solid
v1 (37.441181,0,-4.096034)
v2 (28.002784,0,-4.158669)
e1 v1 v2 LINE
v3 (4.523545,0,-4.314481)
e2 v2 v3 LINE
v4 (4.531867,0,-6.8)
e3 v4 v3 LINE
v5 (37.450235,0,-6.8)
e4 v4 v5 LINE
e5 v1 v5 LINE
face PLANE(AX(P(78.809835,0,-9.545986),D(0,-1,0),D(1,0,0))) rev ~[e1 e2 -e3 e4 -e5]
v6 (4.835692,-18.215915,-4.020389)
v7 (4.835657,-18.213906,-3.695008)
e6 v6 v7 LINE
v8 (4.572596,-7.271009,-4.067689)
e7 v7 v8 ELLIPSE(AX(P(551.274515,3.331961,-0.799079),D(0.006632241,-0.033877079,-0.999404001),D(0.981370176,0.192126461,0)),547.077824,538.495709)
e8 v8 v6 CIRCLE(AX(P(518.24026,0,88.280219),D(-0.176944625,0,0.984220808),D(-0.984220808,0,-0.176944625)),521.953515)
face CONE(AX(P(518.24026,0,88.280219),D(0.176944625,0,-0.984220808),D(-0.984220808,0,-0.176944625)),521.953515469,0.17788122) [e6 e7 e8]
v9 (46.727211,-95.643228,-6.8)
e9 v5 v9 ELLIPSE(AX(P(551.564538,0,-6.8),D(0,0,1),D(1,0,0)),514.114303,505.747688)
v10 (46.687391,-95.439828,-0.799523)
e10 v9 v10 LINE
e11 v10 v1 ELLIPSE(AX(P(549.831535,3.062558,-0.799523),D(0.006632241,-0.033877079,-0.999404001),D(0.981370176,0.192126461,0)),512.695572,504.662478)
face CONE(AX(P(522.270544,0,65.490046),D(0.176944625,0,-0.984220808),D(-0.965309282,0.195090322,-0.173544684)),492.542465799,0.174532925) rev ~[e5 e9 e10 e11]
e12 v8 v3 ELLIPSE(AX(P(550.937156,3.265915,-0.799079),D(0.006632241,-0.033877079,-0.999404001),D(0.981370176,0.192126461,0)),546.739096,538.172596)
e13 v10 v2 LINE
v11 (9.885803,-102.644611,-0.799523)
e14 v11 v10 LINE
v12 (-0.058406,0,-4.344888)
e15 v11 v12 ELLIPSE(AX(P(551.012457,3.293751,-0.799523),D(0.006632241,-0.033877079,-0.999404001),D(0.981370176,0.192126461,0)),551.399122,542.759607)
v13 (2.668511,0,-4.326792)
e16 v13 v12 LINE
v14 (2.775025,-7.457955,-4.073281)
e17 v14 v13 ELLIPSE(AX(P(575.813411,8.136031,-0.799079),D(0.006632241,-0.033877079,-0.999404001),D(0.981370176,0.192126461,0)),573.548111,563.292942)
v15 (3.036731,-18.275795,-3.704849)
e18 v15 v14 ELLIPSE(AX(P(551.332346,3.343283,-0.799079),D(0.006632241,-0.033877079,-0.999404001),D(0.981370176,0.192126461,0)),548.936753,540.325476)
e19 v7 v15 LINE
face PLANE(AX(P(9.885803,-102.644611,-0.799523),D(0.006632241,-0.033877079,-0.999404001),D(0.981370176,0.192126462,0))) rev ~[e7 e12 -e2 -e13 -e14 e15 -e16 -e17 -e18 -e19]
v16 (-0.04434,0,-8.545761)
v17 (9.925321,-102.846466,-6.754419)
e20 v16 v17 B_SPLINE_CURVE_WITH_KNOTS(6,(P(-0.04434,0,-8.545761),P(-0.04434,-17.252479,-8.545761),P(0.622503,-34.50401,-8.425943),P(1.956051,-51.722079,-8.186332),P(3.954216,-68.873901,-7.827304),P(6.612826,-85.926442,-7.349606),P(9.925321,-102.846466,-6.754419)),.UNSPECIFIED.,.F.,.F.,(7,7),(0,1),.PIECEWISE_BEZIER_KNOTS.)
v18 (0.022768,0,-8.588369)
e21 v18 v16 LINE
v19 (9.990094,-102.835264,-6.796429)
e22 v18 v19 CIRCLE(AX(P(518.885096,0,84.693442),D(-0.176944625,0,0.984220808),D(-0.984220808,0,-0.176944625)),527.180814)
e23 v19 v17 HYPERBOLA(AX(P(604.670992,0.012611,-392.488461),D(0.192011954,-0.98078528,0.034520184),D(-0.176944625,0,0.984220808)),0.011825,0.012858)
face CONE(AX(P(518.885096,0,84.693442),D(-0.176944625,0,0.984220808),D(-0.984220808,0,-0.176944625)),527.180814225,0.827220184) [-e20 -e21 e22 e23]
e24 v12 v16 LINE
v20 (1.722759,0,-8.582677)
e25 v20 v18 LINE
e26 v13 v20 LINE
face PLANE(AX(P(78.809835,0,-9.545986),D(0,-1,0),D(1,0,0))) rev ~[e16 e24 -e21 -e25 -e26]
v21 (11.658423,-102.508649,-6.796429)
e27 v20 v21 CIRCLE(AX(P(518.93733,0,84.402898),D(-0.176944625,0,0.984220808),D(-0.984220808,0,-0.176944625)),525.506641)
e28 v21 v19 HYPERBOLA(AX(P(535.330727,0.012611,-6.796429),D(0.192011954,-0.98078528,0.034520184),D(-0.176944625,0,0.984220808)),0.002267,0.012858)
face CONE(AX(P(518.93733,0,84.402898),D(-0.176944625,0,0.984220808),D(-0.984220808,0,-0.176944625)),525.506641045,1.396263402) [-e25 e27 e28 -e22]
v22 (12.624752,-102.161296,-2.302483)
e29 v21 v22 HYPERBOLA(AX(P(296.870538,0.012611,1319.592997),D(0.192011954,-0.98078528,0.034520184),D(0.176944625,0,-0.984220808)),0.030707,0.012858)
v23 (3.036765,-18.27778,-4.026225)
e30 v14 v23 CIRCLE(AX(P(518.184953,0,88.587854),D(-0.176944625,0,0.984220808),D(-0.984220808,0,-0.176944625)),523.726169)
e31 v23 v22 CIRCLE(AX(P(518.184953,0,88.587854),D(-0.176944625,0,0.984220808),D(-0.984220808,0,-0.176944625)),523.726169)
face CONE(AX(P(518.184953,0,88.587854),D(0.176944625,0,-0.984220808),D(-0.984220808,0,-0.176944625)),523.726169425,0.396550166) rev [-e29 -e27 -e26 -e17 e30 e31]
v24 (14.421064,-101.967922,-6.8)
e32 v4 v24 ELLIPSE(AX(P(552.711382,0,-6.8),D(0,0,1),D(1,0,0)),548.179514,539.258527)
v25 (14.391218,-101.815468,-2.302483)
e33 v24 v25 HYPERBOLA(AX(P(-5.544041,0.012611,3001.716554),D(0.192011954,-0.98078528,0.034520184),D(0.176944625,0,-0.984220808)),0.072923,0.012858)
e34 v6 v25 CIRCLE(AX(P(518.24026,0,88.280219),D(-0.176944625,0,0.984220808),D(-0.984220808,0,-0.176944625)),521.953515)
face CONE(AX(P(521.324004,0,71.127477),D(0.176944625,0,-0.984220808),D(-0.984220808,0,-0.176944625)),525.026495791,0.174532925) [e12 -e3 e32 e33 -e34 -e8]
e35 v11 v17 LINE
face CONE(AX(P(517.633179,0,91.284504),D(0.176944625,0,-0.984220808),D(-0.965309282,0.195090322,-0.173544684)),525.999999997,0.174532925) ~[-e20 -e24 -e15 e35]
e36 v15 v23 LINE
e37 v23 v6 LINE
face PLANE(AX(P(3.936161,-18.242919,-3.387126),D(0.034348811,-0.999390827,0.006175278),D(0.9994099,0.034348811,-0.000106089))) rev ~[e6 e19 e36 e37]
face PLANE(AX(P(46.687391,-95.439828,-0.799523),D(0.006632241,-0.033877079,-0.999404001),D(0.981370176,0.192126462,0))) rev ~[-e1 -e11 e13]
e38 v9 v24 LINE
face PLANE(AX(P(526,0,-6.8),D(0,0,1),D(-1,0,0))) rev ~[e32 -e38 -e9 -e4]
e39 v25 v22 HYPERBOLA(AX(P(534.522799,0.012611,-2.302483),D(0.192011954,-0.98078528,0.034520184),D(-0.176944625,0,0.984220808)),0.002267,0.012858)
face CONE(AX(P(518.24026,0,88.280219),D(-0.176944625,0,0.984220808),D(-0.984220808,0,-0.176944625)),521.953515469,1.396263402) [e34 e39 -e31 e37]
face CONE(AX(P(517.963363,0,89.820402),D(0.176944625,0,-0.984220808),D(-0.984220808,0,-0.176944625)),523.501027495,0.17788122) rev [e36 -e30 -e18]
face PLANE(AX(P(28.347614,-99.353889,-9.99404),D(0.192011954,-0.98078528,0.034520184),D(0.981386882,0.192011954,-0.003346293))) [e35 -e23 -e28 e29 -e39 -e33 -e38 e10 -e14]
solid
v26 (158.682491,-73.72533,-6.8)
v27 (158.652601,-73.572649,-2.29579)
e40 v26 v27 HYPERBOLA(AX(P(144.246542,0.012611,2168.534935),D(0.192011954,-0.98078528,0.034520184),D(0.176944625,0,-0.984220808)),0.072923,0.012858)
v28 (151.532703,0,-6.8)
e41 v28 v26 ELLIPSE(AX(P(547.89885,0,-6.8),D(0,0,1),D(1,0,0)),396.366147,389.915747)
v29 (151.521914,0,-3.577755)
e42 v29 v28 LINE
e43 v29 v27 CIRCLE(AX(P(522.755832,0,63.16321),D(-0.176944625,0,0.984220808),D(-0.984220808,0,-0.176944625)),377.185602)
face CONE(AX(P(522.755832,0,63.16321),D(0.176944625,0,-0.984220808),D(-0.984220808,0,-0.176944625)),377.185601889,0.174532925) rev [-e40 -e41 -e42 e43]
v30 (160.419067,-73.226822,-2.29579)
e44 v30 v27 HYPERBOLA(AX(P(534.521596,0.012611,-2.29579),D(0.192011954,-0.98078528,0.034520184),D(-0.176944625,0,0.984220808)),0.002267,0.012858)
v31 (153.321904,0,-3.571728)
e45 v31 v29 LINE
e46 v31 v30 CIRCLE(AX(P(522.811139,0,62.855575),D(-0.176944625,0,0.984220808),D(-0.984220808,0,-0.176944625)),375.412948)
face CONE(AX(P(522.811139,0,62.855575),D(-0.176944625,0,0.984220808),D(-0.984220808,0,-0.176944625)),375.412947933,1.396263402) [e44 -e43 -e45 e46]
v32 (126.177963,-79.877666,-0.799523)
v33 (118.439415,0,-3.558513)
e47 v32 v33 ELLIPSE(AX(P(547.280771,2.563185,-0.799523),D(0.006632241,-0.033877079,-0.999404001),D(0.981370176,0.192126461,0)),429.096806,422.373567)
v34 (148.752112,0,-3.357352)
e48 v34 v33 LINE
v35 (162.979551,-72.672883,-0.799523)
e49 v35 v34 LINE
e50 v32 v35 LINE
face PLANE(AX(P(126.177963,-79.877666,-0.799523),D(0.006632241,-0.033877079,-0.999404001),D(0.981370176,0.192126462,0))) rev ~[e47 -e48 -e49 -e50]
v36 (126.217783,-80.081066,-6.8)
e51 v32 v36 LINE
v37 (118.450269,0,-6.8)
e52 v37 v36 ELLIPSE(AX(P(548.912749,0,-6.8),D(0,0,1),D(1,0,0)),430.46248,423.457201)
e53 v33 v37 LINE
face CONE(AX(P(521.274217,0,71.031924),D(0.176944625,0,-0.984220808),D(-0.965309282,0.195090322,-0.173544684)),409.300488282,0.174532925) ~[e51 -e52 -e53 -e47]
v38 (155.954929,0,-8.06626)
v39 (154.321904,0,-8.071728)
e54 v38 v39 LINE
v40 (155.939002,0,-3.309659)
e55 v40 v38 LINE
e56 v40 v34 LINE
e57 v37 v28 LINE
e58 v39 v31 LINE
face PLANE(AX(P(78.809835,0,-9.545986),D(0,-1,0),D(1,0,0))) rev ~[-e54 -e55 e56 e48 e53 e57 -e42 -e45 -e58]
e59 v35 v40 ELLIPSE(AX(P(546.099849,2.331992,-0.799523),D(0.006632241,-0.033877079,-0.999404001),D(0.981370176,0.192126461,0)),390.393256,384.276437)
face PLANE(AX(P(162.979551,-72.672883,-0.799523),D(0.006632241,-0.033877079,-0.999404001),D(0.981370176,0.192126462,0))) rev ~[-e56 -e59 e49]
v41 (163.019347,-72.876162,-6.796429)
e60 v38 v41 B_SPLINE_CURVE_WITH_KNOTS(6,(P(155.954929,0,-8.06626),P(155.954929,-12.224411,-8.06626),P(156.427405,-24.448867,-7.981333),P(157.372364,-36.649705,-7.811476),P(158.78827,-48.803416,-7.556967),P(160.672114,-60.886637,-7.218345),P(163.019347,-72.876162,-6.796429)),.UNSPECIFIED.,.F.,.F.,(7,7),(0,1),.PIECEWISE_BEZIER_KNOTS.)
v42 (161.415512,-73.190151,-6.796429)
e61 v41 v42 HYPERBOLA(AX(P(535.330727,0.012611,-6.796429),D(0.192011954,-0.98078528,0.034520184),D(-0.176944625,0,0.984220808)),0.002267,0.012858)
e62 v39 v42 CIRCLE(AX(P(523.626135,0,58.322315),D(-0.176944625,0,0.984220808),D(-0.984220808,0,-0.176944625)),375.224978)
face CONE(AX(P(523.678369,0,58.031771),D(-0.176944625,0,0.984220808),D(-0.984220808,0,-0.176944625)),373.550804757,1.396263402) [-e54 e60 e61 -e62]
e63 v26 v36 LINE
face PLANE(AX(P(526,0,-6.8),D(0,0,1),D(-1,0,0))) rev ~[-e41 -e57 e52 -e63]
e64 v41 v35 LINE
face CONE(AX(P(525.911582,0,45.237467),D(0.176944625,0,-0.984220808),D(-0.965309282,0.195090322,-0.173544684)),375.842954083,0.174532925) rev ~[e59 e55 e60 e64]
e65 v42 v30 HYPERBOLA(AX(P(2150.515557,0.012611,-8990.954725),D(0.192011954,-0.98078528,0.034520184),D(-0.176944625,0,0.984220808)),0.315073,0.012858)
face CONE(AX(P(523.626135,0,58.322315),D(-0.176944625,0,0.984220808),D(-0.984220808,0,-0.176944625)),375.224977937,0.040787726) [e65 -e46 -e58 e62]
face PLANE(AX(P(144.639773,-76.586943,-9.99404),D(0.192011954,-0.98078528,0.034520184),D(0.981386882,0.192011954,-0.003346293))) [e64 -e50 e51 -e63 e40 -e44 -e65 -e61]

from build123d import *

# Parameters (mm, degrees)
F1_ANGLE_BACK = 11.25
F1_ANGLE      = 22.5
F2_W          = 148
F2_H          = 20.6737495929
F3_ANGLE      = 30
F5_DEPTH      = 236
F7_DEPTH      = 186.2
F8_W          = 237.9835397005
F8_H          = 111.4437803626
F9_DEPTH      = 169
F11_ANGLE     = 30
F13_ANGLE     = 2


with BuildPart() as f1:
    # F0 (on Front) → F1 (revolve)
    with BuildSketch(Plane.XZ, mode=Mode.PRIVATE) as f1_sk:
        Polygon((37.433034228, -1.662807624), (-0.066965772, -1.7883691504), (0, -21.7882570398), (37.5, -21.6626955134), align=None)
    revolve(f1_sk.sketch.rotate(Axis((525.8388087714, 0, 45.6422517605), (-0.1769446249, 0, 0.9842208084)), -F1_ANGLE_BACK), axis=Axis((525.8388087714, 0, 45.6422517605), (-0.1769446249, 0, 0.9842208084)), revolution_arc=F1_ANGLE)


with BuildPart() as f1b:
    # F0 (on Front) → F1, piece 2 (revolve)
    with BuildSketch(Plane.XZ, mode=Mode.PRIVATE) as f1_sk:
        Polygon((155.9321597647, -1.2660361285), (118.4321597647, -1.391597655), (118.4991255367, -21.3914855443), (155.9991255367, -21.2659240179), align=None)
    revolve(f1_sk.sketch.rotate(Axis((525.8388087714, 0, 45.6422517605), (-0.1769446249, 0, 0.9842208084)), -F1_ANGLE_BACK), axis=Axis((525.8388087714, 0, 45.6422517605), (-0.1769446249, 0, 0.9842208084)), revolution_arc=F1_ANGLE)


with BuildPart() as f3_tool:
    # F2 (on Front) → F3 (revolve)
    with BuildSketch(Plane.XZ):
        with Locations((78, -17.1368747965)):
            Rectangle(F2_W, F2_H)
    revolve(axis=Axis((526, 0, -14.0515491366), (0, 0, 1)), revolution_arc=F3_ANGLE)


with BuildPart() as f1_1:
    add(f1.part)

    # F3: cut by f3_tool
    add(f3_tool.part, mode=Mode.SUBTRACT)

    # F4 (on face) → F5 (cut)
    with BuildSketch(Plane(origin=(19.6894657776, -100.5725829361, 3.539800323), x_dir=(0.9813925868, 0.1918931334, -0.0067539617), z_dir=(0.1920119545, -0.9807852804, 0.0345201838))):
        Polygon((-21.0222958188, 9.4158053398), (-21.0222958188, -4.4840821492), (-9.9895421705, -4.4095212135), (-9.9949485621, -3.6095394819), (27.5044053117, -3.3561134558), (27.5098117032, -4.1560951874), (69.5515194148, -3.8719712809), (67.8833723068, 14.5498467609), align=None)
        Polygon((-9.9949485621, -3.6095394819), (-9.9895421705, -4.4095212135), (27.5098117032, -4.1560951874), (27.5044053117, -3.3561134558), align=None)
    extrude(amount=-F5_DEPTH, mode=Mode.SUBTRACT)


with BuildPart() as f1b_1:
    add(f1b.part)

    # F3: cut by f3_tool
    add(f3_tool.part, mode=Mode.SUBTRACT)

    # F6 (on face) → F7 (cut)
    with BuildSketch(Plane(origin=(19.6894657776, -100.5725829361, 3.539800323), x_dir=(0.9813925868, 0.1918931334, -0.0067539617), z_dir=(0.1920119545, -0.9807852804, 0.0345201838))):
        Polygon((100.3562242672, 19.0413011501), (98.4019598925, -3.6769958553), (108.5075416222, -3.6087008807), (108.5021352307, -2.8087191491), (146.0014891044, -2.555293123), (146.006895496, -3.3552748546), (187.190919741, -3.0769472963), (179.3207939647, 20.8833962762), align=None)
        Polygon((108.5021352307, -2.8087191491), (108.5075416222, -3.6087008807), (146.006895496, -3.3552748546), (146.0014891044, -2.555293123), align=None)
    extrude(amount=-F7_DEPTH, mode=Mode.SUBTRACT)


with BuildPart() as f9_tool:
    # F8 (on Front) → F9 (new body)
    with BuildSketch(Plane.XZ):
        with Locations((78.8098350167, -9.5459856093)):
            Rectangle(F8_W, F8_H)
    extrude(amount=-F9_DEPTH)


with BuildPart() as f1_2:
    add(f1_1.part)

    # F9: cut by f9_tool
    add(f9_tool.part, mode=Mode.SUBTRACT)


with BuildPart() as f1b_2:
    add(f1b_1.part)

    # F9: cut by f9_tool
    add(f9_tool.part, mode=Mode.SUBTRACT)


with BuildPart() as f11_tool:
    # F10 (on Front) → F11 (revolve)
    with BuildSketch(Plane.XZ):
        Polygon((1.7227589607, -8.5826770598), (0.0227684901, -8.5883691504), (0.066965772, -21.7882570398), (4.5820021559, -21.7731393102), (4.5227488708, -4.0766501403), (2.7227589607, -4.0826770598), align=None)
        Polygon((156.0660913087, -21.2659240179), (156.0218940268, -8.0660361285), (154.3219035562, -8.0717282192), (153.3219035562, -3.5717282192), (151.5219136462, -3.5777551387), (151.5811893534, -21.2809408481), align=None)
        Polygon((0.066965772, -21.7882570398), (0.0227684901, -8.5883691504), (-1.333771972, -7.7270860784), (-1.2827424282, -22.9674861319), align=None)
    revolve(axis=Axis((525.9057745435, 0, 45.6422517605), (-0.1769446249, 0, 0.9842208084)), revolution_arc=F11_ANGLE)


with BuildPart() as f1_3:
    add(f1_2.part)

    # F11: cut by f11_tool
    add(f11_tool.part, mode=Mode.SUBTRACT)

    # F12 (on Front) → F13 (revolve, cut)
    with BuildSketch(Plane.XZ):
        Polygon((2.7227589607, -2.8102906857), (2.7227589607, -4.0826770598), (4.5227488708, -4.0766501404), (4.5227488708, -2.8042637662), align=None)
    revolve(axis=Axis((525.9057745435, 0, 45.6422517605), (-0.1769446249, 0, 0.9842208084)), revolution_arc=F13_ANGLE, mode=Mode.SUBTRACT)


with BuildPart() as f1b_3:
    add(f1b_2.part)

    # F11: cut by f11_tool
    add(f11_tool.part, mode=Mode.SUBTRACT)


solid = Compound([f1_3.part, f1b_3.part])
